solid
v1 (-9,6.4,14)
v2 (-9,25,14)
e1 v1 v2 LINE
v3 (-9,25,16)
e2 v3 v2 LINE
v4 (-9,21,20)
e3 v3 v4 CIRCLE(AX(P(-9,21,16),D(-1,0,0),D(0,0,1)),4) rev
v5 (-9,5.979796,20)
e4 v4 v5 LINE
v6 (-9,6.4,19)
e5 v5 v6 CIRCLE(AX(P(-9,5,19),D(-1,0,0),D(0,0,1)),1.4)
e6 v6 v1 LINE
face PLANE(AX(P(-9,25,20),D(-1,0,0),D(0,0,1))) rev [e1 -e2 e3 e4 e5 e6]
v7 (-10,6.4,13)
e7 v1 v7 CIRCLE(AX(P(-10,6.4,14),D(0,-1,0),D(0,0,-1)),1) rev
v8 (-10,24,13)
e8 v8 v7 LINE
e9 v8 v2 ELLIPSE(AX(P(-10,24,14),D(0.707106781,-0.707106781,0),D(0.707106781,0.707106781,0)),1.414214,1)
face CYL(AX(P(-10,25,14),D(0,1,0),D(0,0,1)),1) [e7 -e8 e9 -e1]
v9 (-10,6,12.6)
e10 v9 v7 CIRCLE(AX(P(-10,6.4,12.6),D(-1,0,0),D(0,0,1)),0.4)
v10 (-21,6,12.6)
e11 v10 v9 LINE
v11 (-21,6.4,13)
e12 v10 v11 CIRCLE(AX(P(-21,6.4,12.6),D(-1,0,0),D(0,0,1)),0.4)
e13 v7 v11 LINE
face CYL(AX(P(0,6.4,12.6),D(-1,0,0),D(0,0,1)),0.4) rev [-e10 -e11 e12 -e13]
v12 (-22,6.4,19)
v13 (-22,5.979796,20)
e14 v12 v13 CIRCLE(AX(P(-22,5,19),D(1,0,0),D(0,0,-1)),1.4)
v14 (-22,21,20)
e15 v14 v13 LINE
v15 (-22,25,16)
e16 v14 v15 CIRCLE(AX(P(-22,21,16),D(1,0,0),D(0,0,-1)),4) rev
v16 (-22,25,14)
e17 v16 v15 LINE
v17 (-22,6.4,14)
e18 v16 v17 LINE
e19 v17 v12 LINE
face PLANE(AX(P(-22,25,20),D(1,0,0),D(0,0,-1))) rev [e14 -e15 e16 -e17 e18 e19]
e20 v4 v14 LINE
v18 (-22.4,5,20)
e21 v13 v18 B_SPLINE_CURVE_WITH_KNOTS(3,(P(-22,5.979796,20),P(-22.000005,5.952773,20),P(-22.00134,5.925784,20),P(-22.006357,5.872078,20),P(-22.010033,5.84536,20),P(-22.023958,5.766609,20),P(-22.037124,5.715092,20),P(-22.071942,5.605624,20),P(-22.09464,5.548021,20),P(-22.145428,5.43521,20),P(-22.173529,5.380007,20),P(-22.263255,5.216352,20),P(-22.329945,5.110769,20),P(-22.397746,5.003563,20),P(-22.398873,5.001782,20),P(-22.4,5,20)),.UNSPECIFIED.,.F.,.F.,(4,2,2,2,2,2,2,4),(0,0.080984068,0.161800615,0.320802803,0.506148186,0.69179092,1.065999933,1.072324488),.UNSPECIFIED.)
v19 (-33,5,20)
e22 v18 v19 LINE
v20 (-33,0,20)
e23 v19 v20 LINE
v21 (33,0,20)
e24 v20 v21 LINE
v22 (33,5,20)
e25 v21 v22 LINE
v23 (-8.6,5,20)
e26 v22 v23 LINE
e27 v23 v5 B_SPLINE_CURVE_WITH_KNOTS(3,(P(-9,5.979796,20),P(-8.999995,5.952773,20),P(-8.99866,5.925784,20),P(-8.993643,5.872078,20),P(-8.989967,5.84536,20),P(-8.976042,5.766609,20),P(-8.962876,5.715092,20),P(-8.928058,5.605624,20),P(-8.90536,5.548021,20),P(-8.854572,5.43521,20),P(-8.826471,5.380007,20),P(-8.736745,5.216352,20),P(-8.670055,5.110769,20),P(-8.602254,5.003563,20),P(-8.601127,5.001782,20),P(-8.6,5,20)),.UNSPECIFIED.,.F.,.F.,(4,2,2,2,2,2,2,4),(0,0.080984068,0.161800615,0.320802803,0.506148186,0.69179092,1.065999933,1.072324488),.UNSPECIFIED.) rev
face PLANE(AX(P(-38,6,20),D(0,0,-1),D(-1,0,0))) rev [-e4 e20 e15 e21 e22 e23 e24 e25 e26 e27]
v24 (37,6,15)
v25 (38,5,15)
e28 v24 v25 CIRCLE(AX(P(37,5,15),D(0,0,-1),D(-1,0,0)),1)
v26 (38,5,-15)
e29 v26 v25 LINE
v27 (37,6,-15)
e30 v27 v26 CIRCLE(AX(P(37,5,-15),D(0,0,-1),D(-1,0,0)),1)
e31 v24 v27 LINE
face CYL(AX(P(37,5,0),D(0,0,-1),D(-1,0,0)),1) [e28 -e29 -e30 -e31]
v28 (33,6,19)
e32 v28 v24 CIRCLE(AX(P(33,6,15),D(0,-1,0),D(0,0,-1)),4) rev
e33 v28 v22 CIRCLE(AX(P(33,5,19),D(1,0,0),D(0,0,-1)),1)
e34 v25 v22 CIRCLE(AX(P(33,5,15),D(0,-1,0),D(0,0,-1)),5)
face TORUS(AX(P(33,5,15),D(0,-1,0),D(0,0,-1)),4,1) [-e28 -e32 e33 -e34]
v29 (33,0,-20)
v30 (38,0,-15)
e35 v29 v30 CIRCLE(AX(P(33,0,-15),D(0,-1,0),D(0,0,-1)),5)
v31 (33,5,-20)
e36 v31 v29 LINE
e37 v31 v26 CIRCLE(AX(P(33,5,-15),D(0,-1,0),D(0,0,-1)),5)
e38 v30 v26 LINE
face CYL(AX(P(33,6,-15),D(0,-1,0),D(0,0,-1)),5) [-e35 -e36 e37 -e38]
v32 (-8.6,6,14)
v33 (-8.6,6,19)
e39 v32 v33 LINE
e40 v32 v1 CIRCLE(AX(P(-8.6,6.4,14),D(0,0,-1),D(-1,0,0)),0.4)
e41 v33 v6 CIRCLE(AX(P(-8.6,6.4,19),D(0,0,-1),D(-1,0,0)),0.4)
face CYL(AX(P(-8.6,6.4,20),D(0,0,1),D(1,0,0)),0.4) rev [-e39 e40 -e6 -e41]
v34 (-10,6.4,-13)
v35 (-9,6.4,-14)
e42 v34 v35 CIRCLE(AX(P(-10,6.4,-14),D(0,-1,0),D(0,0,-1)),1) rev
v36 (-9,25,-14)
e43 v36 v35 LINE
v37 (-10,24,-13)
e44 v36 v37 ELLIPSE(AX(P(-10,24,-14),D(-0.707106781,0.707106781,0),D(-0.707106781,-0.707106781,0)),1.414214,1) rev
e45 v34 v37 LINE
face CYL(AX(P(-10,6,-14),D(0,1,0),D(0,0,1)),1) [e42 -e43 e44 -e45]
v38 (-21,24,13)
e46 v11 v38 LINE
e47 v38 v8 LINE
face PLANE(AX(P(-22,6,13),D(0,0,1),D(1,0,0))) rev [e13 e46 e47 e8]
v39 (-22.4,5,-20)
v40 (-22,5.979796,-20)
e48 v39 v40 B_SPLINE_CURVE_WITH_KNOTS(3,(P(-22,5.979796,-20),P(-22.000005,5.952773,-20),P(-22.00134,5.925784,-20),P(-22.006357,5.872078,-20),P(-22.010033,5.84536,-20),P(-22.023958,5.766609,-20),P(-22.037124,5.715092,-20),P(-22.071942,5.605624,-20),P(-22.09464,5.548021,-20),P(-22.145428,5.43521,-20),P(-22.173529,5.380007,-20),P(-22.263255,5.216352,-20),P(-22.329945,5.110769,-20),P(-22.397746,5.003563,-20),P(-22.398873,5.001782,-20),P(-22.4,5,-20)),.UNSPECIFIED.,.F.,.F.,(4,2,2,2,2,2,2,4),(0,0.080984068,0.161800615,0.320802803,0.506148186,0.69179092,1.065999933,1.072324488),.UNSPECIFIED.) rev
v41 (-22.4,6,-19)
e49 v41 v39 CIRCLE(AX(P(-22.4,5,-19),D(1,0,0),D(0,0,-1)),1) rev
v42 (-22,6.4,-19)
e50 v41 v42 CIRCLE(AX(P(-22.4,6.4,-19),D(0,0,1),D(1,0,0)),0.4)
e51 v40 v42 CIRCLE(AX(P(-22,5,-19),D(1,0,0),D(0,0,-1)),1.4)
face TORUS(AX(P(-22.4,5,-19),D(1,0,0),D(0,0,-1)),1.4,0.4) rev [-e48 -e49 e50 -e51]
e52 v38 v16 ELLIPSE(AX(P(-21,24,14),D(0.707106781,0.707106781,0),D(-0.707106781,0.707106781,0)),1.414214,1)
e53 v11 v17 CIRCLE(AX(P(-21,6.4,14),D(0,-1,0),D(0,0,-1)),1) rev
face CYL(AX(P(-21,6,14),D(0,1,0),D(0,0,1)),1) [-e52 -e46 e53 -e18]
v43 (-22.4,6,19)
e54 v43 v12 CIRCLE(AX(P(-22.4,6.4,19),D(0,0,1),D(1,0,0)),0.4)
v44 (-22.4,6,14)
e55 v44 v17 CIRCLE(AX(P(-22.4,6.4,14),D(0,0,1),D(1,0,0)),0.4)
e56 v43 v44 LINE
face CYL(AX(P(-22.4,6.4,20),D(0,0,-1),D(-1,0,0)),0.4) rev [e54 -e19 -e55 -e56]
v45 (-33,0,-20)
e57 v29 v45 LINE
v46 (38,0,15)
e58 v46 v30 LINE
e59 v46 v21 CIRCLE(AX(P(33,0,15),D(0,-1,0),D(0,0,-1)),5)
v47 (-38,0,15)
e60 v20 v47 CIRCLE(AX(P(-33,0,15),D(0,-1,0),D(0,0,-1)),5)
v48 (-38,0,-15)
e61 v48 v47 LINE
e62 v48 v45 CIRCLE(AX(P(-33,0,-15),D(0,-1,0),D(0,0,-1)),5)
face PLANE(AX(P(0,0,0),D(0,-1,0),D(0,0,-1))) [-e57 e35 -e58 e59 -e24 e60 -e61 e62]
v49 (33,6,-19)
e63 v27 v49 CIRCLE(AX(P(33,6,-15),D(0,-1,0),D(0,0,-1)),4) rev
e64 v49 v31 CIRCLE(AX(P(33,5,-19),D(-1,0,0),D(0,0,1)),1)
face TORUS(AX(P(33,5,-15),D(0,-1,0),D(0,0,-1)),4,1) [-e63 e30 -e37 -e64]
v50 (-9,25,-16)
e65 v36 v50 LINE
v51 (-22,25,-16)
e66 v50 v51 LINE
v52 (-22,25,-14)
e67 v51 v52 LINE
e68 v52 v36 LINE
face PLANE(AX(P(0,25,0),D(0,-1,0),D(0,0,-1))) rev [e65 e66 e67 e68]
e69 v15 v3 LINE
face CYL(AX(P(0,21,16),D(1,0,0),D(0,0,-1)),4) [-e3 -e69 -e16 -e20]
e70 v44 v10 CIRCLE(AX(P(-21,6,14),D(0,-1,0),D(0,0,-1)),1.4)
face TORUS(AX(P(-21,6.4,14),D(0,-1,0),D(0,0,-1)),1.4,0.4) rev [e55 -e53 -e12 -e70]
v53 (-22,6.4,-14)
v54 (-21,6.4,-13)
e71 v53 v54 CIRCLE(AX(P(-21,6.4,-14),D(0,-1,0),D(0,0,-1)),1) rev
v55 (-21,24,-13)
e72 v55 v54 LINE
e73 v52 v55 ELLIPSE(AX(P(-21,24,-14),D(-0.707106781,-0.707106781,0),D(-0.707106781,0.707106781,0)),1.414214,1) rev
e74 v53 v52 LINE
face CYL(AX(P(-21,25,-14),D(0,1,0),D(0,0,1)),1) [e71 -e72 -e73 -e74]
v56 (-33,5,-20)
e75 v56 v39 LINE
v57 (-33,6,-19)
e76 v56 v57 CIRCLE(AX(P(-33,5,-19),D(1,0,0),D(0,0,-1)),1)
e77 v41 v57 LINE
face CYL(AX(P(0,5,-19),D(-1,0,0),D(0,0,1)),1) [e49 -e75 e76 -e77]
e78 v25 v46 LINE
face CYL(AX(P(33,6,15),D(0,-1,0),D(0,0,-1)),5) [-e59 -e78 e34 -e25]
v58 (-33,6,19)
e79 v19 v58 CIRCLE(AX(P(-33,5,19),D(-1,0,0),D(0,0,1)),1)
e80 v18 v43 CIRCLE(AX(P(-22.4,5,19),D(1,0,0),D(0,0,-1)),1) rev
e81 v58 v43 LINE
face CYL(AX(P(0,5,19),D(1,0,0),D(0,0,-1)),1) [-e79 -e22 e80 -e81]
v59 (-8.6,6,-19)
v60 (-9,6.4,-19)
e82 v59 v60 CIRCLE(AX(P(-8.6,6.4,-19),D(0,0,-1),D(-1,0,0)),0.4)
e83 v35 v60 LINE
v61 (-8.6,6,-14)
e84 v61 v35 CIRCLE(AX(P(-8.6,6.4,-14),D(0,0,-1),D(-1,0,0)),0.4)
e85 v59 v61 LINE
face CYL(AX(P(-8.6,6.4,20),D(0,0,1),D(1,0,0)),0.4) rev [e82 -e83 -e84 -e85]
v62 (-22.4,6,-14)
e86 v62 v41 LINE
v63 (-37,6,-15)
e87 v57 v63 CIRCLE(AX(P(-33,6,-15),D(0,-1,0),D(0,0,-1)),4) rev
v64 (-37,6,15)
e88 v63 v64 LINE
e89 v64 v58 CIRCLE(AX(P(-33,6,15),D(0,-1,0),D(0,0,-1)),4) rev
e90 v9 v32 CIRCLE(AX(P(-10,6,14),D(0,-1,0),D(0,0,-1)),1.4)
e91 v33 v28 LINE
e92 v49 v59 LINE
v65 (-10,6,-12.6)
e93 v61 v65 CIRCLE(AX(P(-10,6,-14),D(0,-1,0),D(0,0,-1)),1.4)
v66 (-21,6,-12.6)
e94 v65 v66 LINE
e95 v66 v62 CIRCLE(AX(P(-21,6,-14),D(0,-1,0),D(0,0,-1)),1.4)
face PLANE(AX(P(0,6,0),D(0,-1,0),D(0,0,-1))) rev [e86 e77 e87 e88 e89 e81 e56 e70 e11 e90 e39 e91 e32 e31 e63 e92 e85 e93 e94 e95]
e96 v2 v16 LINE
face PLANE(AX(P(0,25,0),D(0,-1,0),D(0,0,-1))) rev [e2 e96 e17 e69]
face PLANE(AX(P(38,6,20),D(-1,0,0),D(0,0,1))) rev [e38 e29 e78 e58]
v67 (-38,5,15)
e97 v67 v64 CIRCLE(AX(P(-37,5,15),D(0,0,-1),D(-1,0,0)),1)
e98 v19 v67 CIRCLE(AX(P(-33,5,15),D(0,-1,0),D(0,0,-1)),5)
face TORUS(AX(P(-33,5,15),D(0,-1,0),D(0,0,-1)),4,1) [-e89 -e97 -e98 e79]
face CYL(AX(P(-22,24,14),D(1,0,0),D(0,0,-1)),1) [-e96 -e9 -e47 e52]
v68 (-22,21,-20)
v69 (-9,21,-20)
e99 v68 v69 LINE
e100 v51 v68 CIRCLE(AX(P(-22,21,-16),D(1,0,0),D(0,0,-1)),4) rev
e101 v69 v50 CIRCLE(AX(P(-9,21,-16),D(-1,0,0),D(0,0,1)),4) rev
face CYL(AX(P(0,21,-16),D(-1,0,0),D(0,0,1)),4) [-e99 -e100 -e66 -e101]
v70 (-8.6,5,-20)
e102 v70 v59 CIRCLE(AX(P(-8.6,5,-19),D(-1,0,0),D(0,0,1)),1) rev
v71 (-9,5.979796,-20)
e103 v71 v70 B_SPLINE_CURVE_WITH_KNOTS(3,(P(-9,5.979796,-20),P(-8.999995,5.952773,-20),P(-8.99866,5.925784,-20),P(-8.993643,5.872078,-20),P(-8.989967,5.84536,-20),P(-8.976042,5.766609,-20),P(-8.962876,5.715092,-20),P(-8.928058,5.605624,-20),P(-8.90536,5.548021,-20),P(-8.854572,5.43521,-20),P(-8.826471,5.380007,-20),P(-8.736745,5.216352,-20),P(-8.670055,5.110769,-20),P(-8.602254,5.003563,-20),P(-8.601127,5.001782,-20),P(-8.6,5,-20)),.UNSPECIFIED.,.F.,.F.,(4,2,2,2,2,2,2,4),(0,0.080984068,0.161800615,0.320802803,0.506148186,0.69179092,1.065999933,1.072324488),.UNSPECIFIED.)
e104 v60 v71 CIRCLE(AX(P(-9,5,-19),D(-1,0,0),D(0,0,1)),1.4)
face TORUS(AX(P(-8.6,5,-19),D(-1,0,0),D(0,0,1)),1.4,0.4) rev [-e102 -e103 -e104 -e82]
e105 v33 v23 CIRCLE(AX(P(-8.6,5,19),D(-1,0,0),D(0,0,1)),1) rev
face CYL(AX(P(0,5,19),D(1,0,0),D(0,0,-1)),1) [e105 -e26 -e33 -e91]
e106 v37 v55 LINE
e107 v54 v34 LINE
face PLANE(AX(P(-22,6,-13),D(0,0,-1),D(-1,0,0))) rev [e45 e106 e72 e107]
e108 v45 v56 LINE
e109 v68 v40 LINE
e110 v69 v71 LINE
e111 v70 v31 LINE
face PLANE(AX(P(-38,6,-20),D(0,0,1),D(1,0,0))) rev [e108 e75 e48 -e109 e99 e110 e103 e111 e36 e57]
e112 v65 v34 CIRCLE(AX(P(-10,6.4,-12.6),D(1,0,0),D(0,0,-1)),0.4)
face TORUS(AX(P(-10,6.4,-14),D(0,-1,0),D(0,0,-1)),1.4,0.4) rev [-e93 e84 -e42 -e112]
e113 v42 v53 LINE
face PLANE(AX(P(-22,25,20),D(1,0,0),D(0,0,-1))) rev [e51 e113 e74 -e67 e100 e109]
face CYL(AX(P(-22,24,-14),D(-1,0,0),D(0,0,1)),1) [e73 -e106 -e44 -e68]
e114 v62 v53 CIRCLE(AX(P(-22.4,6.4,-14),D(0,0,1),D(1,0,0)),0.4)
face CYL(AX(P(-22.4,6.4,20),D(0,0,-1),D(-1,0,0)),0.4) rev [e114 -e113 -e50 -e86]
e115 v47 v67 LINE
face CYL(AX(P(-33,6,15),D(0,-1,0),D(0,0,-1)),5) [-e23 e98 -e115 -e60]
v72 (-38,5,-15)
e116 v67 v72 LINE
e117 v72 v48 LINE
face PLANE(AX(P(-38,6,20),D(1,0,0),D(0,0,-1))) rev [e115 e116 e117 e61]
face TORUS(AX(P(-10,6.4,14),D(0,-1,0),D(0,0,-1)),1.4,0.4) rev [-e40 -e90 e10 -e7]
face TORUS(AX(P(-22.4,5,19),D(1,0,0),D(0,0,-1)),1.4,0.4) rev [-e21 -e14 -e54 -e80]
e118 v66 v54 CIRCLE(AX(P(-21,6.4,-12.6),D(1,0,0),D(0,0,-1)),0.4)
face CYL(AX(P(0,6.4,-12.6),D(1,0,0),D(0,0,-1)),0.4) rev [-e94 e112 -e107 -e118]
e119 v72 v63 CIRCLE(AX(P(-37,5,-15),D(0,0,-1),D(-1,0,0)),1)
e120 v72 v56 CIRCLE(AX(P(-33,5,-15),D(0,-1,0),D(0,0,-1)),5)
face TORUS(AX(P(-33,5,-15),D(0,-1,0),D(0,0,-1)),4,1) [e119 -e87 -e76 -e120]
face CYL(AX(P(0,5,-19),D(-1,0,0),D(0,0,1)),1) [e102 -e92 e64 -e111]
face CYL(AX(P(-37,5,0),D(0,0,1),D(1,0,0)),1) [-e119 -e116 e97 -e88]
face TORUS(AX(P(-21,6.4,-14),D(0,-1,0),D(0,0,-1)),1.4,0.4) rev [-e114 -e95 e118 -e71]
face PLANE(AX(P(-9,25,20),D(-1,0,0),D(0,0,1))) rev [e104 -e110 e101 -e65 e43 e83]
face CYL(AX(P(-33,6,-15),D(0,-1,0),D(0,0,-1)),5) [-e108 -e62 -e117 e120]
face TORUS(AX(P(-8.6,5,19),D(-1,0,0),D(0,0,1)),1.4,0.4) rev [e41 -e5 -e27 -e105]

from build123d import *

# Parameters (mm, degrees)
SKETCH_1_W          = 76
SKETCH_1_H          = 40
EXTRUDE_1_DEPTH     = 6
SKETCH_2_W          = 13
SKETCH_2_H          = 40
EXTRUDE_2_DEPTH     = 19
SKETCH_3_W          = 13
SKETCH_3_H          = 26
CUT_EXTRUDE_1_DEPTH = 19
FILLET_1_R          = 4
FILLET_2_R          = 1
FILLET_3_R          = 1
FILLET_4_R          = 5
FILLET_5_R          = 1
FILLET_6_R          = 1
FILLET_7_R          = 0.4


with BuildPart() as part:
    # Эскиз1 → Бобышка-Вытянуть1 (new body)
    with BuildSketch(Plane(origin=(0, 0, 0), x_dir=(1, 0, 0), z_dir=(0, 1, 0))):
        Rectangle(SKETCH_1_W, SKETCH_1_H)
    extrude(amount=EXTRUDE_1_DEPTH)

    # Эскиз2 → Бобышка-Вытянуть2 (add)
    with BuildSketch(Plane(origin=(0, 6, 0), x_dir=(1, 0, 0), z_dir=(0, 1, 0))):
        with Locations((-15.5, 0)):
            Rectangle(SKETCH_2_W, SKETCH_2_H)
    extrude(amount=EXTRUDE_2_DEPTH)

    # Эскиз3 → Вырез-Вытянуть1 (cut)
    with BuildSketch(Plane(origin=(0, 25, 0), x_dir=(1, 0, 0), z_dir=(0, 1, 0))):
        with Locations((-15.5, 0)):
            Rectangle(SKETCH_3_W, SKETCH_3_H)
    extrude(amount=-CUT_EXTRUDE_1_DEPTH, mode=Mode.SUBTRACT)

    # Скругление1
    fillet_1_edges = [part.edges().sort_by_distance(p)[0] for p in [
        (-15.5, 25, 20),
        (-15.5, 25, -20),
    ]]
    fillet(fillet_1_edges, radius=FILLET_1_R)

    # Скругление2
    fillet_2_edges = [part.edges().sort_by_distance(p)[0] for p in [
        (-22, 15.5, -13),
        (-9, 15.5, -13),
        (-15.5, 25, -13),
    ]]
    fillet(fillet_2_edges, radius=FILLET_2_R)

    # Скругление3
    fillet_3_edges = [part.edges().sort_by_distance(p)[0] for p in [
        (-22, 15.5, 13),
        (-9, 15.5, 13),
        (-15.5, 25, 13),
    ]]
    fillet(fillet_3_edges, radius=FILLET_3_R)

    # Скругление4
    fillet_4_edges = [part.edges().sort_by_distance(p)[0] for p in [
        (38, 3, 20),
        (-38, 3, 20),
        (-38, 3, -20),
        (38, 3, -20),
    ]]
    fillet(fillet_4_edges, radius=FILLET_4_R)

    # Скругление5
    fillet_5_edges = [part.edges().sort_by_distance(p)[0] for p in [
        (-38, 6, 0),
        (-27.5, 6, 20),
        (-36.535533906, 6, 18.535533906),
        (-36.535533906, 6, -18.535533906),
        (-27.5, 6, -20),
    ]]
    fillet(fillet_5_edges, radius=FILLET_5_R)

    # Скругление6
    fillet_6_edges = [part.edges().sort_by_distance(p)[0] for p in [
        (12, 6, -20),
        (38, 6, 0),
        (36.535533906, 6, -18.535533906),
        (36.535533906, 6, 18.535533906),
        (12, 6, 20),
    ]]
    fillet(fillet_6_edges, radius=FILLET_6_R)

    # Скругление7
    # the kernel refuses this fillet: 0.4 mm, written as the material it adds along each edge
    with BuildSketch(Plane(origin=(-22, 6, -19), x_dir=(-1, 0, 0), z_dir=(0, 0, 1)), Plane(origin=(-9, 6, 19), x_dir=(1, 0, 0), z_dir=(0, 0, -1)), Plane(origin=(-9, 6, -14), x_dir=(1, 0, 0), z_dir=(0, 0, -1)), Plane(origin=(-22, 6, 14), x_dir=(-1, 0, 0), z_dir=(0, 0, 1))) as fillet_7_piece_1:
        with BuildLine():
            CenterArc((FILLET_7_R, -FILLET_7_R), FILLET_7_R, 90, 90)
            Line((0, -FILLET_7_R), (0, 0))
            Line((0, 0), (FILLET_7_R, 0))
        make_face()
    extrude(amount=5)
    with BuildSketch(Plane(origin=(-22, 5, -19), x_dir=(0, 1, 0), z_dir=(0, 0, 1))) as fillet_7_piece_2_section:
        with BuildLine():
            CenterArc((1 + FILLET_7_R, FILLET_7_R), FILLET_7_R, 180, 90)
            Line((1, FILLET_7_R), (1, 0))
            Line((1, 0), (1 + FILLET_7_R, 0))
        make_face()
    fillet_7_piece_2 = revolve(axis=Axis((-22, 5, -19), (-1, 0, 0)), revolution_arc=147.318795695, mode=Mode.PRIVATE)
    fillet_7_piece_2 = split(fillet_7_piece_2, bisect_by=Plane(origin=(-22.06536945, 6.084454663, -20), z_dir=(0, 0, 1)), keep=Keep.TOP, mode=Mode.PRIVATE)
    add(fillet_7_piece_2)
    with BuildSketch(Plane(origin=(-22, 5, 19), x_dir=(0, 1, 0), z_dir=(0, 0, -1))) as fillet_7_piece_3_section:
        with BuildLine():
            CenterArc((1 + FILLET_7_R, -FILLET_7_R), FILLET_7_R, 90, 90)
            Line((1 + FILLET_7_R, 0), (1, 0))
            Line((1, 0), (1, -FILLET_7_R))
        make_face()
    fillet_7_piece_3 = revolve(axis=Axis((-22, 5, 19), (1, 0, 0)), revolution_arc=147.318795695, mode=Mode.PRIVATE)
    fillet_7_piece_3 = split(fillet_7_piece_3, bisect_by=Plane(origin=(-22.10538555, 5.722614098, 20), z_dir=(0, 0, -1)), keep=Keep.TOP, mode=Mode.PRIVATE)
    add(fillet_7_piece_3)
    with BuildSketch(Plane(origin=(-9, 5, -19), x_dir=(0, 1, 0), z_dir=(0, 0, 1))) as fillet_7_piece_4_section:
        with BuildLine():
            CenterArc((1 + FILLET_7_R, -FILLET_7_R), FILLET_7_R, 90, 90)
            Line((1, -FILLET_7_R), (1, 0))
            Line((1, 0), (1 + FILLET_7_R, 0))
        make_face()
    fillet_7_piece_4 = revolve(axis=Axis((-9, 5, -19), (-1, 0, 0)), revolution_arc=147.318795695, mode=Mode.PRIVATE)
    fillet_7_piece_4 = split(fillet_7_piece_4, bisect_by=Plane(origin=(-8.934630555, 6.084454665, -20), z_dir=(0, 0, 1)), keep=Keep.TOP, mode=Mode.PRIVATE)
    add(fillet_7_piece_4)
    with BuildSketch(Plane(origin=(-9, 5, 19), x_dir=(0, 1, 0), z_dir=(0, 0, -1))) as fillet_7_piece_5_section:
        with BuildLine():
            CenterArc((1 + FILLET_7_R, FILLET_7_R), FILLET_7_R, 180, 90)
            Line((1 + FILLET_7_R, 0), (1, 0))
            Line((1, 0), (1, FILLET_7_R))
        make_face()
    fillet_7_piece_5 = revolve(axis=Axis((-9, 5, 19), (1, 0, 0)), revolution_arc=147.318795695, mode=Mode.PRIVATE)
    fillet_7_piece_5 = split(fillet_7_piece_5, bisect_by=Plane(origin=(-8.894614474, 5.72261425, 20), z_dir=(0, 0, -1)), keep=Keep.TOP, mode=Mode.PRIVATE)
    add(fillet_7_piece_5)
    with BuildSketch(Plane(origin=(-21, 6, -13), x_dir=(0, 0, 1), z_dir=(1, 0, 0)), Plane(origin=(-10, 6, 13), x_dir=(0, 0, -1), z_dir=(-1, 0, 0))) as fillet_7_piece_6:
        with BuildLine():
            CenterArc((FILLET_7_R, -FILLET_7_R), FILLET_7_R, 90, 90)
            Line((0, -FILLET_7_R), (0, 0))
            Line((0, 0), (FILLET_7_R, 0))
        make_face()
    extrude(amount=11)
    with BuildSketch(Plane(origin=(-10, 6, -14), x_dir=(1, 0, 0), z_dir=(0, 0, -1))) as fillet_7_piece_7:
        with BuildLine():
            CenterArc((1 + FILLET_7_R, -FILLET_7_R), FILLET_7_R, 90, 90)
            Line((1, -FILLET_7_R), (1, 0))
            Line((1, 0), (1 + FILLET_7_R, 0))
        make_face()
    revolve(axis=Axis((-10, 6, -14), (0, -1, 0)), revolution_arc=90)
    with BuildSketch(Plane(origin=(-21, 6, -14), x_dir=(0, 0, 1), z_dir=(1, 0, 0))) as fillet_7_piece_8:
        with BuildLine():
            CenterArc((1 + FILLET_7_R, -FILLET_7_R), FILLET_7_R, 90, 90)
            Line((1, -FILLET_7_R), (1, 0))
            Line((1, 0), (1 + FILLET_7_R, 0))
        make_face()
    revolve(axis=Axis((-21, 6, -14), (0, -1, 0)), revolution_arc=90)
    with BuildSketch(Plane(origin=(-10, 6, 14), x_dir=(1, 0, 0), z_dir=(0, 0, 1))) as fillet_7_piece_9:
        with BuildLine():
            CenterArc((1 + FILLET_7_R, FILLET_7_R), FILLET_7_R, 180, 90)
            Line((1, FILLET_7_R), (1, 0))
            Line((1, 0), (1 + FILLET_7_R, 0))
        make_face()
    revolve(axis=Axis((-10, 6, 14), (0, 1, 0)), revolution_arc=90)
    with BuildSketch(Plane(origin=(-21, 6, 14), x_dir=(0, 0, -1), z_dir=(1, 0, 0))) as fillet_7_piece_10:
        with BuildLine():
            CenterArc((1 + FILLET_7_R, FILLET_7_R), FILLET_7_R, 180, 90)
            Line((1, FILLET_7_R), (1, 0))
            Line((1, 0), (1 + FILLET_7_R, 0))
        make_face()
    revolve(axis=Axis((-21, 6, 14), (0, 1, 0)), revolution_arc=90)


solid = part.part
